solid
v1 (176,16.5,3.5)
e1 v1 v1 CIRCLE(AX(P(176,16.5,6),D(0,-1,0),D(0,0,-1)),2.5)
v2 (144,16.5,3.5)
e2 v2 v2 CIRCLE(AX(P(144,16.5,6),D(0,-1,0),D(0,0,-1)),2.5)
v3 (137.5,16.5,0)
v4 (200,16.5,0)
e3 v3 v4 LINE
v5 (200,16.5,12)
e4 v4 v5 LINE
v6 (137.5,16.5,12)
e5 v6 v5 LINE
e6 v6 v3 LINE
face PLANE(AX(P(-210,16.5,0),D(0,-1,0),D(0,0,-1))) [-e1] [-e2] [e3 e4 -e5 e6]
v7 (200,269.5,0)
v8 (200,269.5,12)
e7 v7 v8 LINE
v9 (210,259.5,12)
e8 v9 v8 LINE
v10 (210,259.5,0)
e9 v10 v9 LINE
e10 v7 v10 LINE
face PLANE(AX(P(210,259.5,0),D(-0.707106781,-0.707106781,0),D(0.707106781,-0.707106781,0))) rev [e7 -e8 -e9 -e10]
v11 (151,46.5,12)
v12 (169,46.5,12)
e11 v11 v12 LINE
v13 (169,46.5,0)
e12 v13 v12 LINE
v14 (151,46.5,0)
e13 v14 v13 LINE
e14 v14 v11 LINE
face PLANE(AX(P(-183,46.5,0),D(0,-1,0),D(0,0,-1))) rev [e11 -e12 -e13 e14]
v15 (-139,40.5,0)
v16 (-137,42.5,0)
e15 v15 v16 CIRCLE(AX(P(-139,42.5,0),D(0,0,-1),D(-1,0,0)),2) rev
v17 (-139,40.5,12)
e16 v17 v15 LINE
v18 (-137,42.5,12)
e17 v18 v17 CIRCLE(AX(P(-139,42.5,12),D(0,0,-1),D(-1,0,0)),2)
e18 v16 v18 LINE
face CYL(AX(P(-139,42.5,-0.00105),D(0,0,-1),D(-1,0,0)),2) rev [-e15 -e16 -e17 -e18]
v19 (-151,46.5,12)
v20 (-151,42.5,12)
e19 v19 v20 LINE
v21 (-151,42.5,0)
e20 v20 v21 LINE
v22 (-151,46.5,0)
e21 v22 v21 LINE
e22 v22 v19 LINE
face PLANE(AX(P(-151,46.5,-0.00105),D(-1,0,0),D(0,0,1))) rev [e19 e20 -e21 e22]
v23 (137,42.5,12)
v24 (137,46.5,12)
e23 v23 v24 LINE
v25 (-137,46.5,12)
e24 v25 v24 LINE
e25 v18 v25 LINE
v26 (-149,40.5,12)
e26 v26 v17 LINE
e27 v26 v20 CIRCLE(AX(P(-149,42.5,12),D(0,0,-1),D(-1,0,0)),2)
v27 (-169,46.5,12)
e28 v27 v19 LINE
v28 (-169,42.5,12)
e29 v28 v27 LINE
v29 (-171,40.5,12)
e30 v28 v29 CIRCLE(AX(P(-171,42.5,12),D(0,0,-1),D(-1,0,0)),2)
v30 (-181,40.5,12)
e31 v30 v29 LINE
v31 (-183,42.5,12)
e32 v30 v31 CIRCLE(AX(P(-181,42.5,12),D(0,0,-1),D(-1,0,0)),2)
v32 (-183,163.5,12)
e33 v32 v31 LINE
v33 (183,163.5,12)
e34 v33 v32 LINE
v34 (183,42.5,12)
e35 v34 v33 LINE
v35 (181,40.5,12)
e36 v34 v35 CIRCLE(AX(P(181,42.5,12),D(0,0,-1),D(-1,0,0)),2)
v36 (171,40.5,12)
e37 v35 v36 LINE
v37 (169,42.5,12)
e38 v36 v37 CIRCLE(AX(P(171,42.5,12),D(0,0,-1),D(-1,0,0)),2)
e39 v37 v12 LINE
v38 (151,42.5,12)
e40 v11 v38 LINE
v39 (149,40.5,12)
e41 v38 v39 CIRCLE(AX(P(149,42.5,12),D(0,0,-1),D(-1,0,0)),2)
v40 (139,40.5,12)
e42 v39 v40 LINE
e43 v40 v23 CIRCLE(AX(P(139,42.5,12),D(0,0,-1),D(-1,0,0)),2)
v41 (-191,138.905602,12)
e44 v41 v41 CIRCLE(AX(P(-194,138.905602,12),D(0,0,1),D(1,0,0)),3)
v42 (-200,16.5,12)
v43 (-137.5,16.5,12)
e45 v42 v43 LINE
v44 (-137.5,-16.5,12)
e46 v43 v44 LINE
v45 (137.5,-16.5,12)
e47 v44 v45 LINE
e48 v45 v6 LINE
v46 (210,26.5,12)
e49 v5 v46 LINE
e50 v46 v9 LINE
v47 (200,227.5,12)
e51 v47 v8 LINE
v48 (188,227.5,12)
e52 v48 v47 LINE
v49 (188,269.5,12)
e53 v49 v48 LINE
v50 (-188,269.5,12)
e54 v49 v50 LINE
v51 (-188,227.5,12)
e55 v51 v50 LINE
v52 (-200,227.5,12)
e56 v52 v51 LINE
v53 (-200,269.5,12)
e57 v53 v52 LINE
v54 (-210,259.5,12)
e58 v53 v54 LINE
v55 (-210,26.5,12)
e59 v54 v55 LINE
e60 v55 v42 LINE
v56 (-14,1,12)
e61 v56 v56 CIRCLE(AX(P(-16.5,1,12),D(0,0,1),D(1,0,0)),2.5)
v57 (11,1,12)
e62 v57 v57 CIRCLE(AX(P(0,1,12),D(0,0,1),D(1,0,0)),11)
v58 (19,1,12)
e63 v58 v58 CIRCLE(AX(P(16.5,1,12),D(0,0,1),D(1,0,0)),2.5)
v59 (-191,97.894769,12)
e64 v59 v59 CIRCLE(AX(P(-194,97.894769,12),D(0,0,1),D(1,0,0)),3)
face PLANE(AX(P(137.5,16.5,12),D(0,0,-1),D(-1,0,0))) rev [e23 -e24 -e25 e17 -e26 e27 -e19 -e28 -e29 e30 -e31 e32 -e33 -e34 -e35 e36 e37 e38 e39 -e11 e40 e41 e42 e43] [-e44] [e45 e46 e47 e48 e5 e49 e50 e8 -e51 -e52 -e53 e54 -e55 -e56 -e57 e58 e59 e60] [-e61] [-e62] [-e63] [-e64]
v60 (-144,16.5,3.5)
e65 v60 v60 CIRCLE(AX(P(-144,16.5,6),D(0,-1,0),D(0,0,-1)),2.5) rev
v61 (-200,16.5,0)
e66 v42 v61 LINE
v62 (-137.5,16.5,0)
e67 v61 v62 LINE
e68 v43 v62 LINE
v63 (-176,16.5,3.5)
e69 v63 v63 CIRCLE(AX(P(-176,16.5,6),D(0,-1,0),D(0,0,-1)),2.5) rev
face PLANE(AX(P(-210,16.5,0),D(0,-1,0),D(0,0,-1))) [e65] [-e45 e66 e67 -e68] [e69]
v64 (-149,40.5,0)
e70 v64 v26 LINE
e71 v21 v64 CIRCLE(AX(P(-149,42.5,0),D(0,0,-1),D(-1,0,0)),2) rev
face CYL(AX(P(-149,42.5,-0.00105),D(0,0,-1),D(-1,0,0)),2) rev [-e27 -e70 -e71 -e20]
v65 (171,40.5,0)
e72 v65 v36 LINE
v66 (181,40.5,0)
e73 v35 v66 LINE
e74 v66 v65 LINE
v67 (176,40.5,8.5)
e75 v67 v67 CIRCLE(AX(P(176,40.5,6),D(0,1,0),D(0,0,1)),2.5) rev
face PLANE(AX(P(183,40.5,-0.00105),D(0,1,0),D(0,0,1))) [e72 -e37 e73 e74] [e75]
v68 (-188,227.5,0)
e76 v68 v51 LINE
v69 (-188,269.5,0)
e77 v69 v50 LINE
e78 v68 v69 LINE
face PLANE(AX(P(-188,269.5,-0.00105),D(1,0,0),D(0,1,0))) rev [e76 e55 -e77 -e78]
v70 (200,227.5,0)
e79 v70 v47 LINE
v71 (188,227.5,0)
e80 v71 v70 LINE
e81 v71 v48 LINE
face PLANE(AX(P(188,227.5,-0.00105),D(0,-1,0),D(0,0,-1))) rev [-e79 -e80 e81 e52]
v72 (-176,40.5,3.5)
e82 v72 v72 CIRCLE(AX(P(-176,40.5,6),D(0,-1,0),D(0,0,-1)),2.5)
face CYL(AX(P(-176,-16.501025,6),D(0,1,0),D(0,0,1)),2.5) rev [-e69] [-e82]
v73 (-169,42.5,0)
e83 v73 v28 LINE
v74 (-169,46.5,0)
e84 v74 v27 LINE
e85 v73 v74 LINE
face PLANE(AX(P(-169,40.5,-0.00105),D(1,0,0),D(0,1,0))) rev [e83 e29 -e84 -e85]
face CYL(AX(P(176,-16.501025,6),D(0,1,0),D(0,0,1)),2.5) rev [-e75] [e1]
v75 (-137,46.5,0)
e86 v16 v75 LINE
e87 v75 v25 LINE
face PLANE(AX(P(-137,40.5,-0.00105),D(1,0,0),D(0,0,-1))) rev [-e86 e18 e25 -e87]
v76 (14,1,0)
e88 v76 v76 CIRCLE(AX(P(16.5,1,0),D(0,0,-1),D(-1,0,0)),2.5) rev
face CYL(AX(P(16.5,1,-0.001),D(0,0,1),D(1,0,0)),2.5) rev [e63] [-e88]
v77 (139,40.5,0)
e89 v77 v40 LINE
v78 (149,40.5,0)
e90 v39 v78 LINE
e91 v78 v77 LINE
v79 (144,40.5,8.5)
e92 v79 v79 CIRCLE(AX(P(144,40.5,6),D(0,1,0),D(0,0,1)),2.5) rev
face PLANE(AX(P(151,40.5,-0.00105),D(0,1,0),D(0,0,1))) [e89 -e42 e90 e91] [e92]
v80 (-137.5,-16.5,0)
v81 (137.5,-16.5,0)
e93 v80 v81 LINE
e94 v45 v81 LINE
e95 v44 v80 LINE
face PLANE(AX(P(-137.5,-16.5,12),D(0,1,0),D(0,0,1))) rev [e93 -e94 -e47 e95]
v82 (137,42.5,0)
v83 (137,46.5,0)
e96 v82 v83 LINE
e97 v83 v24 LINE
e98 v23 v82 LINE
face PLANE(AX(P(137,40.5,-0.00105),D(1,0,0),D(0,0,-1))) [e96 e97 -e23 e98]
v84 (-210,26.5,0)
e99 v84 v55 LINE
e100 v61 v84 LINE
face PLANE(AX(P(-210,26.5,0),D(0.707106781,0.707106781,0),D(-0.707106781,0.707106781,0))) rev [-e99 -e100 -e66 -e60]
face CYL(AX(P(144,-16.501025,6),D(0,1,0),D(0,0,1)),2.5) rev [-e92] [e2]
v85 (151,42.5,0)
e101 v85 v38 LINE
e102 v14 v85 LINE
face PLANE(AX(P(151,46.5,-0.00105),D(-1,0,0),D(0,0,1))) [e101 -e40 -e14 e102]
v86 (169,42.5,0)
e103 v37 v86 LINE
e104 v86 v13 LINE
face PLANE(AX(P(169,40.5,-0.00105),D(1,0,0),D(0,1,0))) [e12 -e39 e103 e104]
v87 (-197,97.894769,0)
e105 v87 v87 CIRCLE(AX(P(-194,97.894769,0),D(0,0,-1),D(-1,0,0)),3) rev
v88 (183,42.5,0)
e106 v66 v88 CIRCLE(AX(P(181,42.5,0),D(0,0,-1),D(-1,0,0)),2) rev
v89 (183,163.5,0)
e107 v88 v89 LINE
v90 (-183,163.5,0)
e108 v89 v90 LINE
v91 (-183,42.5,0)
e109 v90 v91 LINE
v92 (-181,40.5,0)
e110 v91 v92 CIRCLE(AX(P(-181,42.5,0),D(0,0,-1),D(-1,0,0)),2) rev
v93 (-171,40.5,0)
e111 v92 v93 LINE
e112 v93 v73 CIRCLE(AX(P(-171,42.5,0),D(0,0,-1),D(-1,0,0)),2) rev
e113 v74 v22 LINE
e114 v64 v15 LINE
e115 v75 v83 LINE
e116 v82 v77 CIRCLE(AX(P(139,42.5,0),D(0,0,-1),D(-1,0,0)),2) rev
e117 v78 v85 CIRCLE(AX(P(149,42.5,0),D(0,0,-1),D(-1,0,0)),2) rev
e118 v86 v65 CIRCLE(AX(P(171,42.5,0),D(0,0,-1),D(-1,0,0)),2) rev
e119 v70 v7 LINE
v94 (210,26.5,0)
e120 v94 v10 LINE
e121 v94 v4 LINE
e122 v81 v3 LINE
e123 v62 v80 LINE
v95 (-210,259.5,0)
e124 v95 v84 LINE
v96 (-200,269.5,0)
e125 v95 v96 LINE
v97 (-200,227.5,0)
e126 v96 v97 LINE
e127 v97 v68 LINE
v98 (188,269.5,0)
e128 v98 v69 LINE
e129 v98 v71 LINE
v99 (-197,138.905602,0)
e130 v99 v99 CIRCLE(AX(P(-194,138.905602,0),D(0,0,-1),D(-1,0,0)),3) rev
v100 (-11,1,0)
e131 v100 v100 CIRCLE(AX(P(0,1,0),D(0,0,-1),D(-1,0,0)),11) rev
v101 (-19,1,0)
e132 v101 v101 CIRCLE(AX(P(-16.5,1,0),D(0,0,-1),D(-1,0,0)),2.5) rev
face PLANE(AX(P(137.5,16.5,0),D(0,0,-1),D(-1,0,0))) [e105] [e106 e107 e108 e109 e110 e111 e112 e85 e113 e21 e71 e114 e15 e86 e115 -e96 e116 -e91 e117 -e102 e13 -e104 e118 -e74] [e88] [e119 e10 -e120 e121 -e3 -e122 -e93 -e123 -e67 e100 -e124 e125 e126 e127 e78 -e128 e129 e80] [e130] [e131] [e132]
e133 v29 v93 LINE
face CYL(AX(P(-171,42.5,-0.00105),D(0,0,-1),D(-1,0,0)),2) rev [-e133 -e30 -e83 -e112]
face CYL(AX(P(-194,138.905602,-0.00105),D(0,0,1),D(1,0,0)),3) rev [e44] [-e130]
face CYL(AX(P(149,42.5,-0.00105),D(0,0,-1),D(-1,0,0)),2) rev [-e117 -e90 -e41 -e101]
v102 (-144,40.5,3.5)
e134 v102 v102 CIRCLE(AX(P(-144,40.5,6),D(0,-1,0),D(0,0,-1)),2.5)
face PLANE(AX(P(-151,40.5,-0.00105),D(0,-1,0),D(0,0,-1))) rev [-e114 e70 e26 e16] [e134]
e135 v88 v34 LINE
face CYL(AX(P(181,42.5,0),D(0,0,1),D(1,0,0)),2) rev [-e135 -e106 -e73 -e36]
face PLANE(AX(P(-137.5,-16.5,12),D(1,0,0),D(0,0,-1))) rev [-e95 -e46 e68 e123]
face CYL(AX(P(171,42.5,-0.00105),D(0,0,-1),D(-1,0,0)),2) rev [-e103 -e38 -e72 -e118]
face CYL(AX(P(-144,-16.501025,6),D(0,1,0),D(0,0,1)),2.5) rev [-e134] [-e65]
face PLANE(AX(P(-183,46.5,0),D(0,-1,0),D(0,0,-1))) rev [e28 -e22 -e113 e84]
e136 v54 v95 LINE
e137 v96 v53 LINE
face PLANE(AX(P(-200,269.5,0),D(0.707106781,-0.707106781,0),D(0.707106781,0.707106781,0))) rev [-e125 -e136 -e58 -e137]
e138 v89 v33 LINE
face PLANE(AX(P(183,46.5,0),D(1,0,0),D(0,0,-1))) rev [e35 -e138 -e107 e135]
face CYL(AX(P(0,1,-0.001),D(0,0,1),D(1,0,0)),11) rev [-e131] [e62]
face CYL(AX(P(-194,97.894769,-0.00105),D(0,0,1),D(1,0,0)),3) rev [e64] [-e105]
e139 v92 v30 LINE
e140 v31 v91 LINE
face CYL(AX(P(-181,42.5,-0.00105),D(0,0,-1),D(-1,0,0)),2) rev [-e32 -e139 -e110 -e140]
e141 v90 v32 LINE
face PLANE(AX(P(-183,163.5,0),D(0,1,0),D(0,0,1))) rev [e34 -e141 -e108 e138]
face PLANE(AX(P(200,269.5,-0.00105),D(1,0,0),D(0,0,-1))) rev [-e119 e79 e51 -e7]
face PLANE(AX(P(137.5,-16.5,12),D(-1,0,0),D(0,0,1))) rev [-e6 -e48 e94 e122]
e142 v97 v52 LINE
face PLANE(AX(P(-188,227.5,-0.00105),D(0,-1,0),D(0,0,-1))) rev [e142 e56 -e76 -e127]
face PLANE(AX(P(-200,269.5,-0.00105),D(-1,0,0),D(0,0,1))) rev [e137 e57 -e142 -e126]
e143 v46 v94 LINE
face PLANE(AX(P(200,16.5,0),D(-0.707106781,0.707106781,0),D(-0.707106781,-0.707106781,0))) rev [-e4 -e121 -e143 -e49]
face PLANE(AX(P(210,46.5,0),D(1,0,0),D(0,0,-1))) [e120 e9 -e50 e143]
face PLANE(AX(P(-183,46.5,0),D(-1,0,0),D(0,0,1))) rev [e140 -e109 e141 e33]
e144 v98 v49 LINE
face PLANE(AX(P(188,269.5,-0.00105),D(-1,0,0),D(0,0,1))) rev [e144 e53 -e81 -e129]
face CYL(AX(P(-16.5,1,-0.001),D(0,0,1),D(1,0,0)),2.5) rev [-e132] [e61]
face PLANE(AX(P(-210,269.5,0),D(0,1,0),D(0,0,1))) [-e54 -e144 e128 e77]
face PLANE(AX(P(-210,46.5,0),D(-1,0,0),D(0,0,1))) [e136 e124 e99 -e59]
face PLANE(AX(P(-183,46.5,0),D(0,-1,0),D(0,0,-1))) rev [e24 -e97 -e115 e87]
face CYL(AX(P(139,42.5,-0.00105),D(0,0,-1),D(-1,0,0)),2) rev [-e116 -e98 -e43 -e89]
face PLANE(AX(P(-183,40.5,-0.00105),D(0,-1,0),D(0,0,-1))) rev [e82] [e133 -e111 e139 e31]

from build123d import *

# Parameters (mm, degrees)
SKETCH1_W            = 275
SKETCH1_H            = 33
BOSS_EXTRUDE1_DEPTH  = 12
CUT_EXTRUDE1_REACH   = 141.005
SKETCH2_R            = 11
SKETCH2_R_2          = 2.5
SKETCH3_W            = 366
SKETCH3_H            = 117
BOSS_EXTRUDE2_DEPTH  = 12
CUT_EXTRUDE2_REACH   = 308.55
SKETCH4_R            = 2.5
CUT_EXTRUDE3_REACH   = 343.869
SKETCH5_W            = 14
SKETCH5_H            = 6
FILLET1_R            = 2
FILLET1_OF_MIRROR2_R = 2
CHAMFER1_SIZE        = 10
CUT_EXTRUDE4_REACH   = 343.869
SKETCH6_R            = 3
CUT_EXTRUDE6_REACH   = 343.869
SKETCH8_W            = 12
SKETCH8_H            = 42
CHAMFER2_SIZE        = 10


with BuildPart() as part:
    # Sketch1 → Boss-Extrude1 (new body)
    with BuildSketch(Plane.XY):
        Rectangle(SKETCH1_W, SKETCH1_H)
    extrude(amount=BOSS_EXTRUDE1_DEPTH)

    # Sketch2 → Cut-Extrude1 (cut, up to next)
    with BuildSketch(Plane.XY.offset(12), mode=Mode.PRIVATE) as cut_extrude1_sk1:
        with Locations((0, 1)):
            Circle(SKETCH2_R)
    cut_extrude1_tool1 = extrude(cut_extrude1_sk1.sketch, amount=-CUT_EXTRUDE1_REACH, mode=Mode.PRIVATE) & part.part
    # Sketch2 → Cut-Extrude1 (cut, up to next)
    with BuildSketch(Plane.XY.offset(12), mode=Mode.PRIVATE) as cut_extrude1_sk2:
        with Locations((-16.5, 1)):
            Circle(SKETCH2_R_2)
    cut_extrude1_tool2 = extrude(cut_extrude1_sk2.sketch, amount=-CUT_EXTRUDE1_REACH, mode=Mode.PRIVATE) & part.part
    # Sketch2 → Cut-Extrude1 (cut, up to next)
    with BuildSketch(Plane.XY.offset(12), mode=Mode.PRIVATE) as cut_extrude1_sk3:
        with Locations((16.5, 1)):
            Circle(SKETCH2_R_2)
    cut_extrude1_tool3 = extrude(cut_extrude1_sk3.sketch, amount=-CUT_EXTRUDE1_REACH, mode=Mode.PRIVATE) & part.part
    add(cut_extrude1_tool1.solids().sort_by_distance((0, 1, 12))[0], mode=Mode.SUBTRACT)
    add(cut_extrude1_tool2.solids().sort_by_distance((-16.5, 1, 12))[0], mode=Mode.SUBTRACT)
    add(cut_extrude1_tool3.solids().sort_by_distance((16.5, 1, 12))[0], mode=Mode.SUBTRACT)

    # Sketch3 → Boss-Extrude2 (add)
    with BuildSketch(Plane.XY.offset(12)):
        Polygon((-210, 16.5), (210, 16.5), (210, 46.5), (210, 269.5), (-210, 269.5), (-210, 46.5), align=None)
        with Locations((0, 105)):
            Rectangle(SKETCH3_W, SKETCH3_H, mode=Mode.SUBTRACT)
    extrude(amount=-BOSS_EXTRUDE2_DEPTH)

    # Sketch4 → Cut-Extrude2 (cut, up to next)
    with BuildSketch(Plane(origin=(0, 46.5, 0), x_dir=(1, 0, 0), z_dir=(0, 1, 0)), mode=Mode.PRIVATE) as cut_extrude2_sk1:
        with Locations(Location((-144, -6, 0), (0, 0, 270))):
            Circle(SKETCH4_R)
    cut_extrude2_tool1 = extrude(cut_extrude2_sk1.sketch, amount=-CUT_EXTRUDE2_REACH, mode=Mode.PRIVATE) & part.part
    # Sketch4 → Cut-Extrude2 (cut, up to next)
    with BuildSketch(Plane(origin=(0, 46.5, 0), x_dir=(1, 0, 0), z_dir=(0, 1, 0)), mode=Mode.PRIVATE) as cut_extrude2_sk2:
        with Locations(Location((-176, -6, 0), (0, 0, 270))):
            Circle(SKETCH4_R)
    cut_extrude2_tool2 = extrude(cut_extrude2_sk2.sketch, amount=-CUT_EXTRUDE2_REACH, mode=Mode.PRIVATE) & part.part
    cut_extrude2_1 = cut_extrude2_tool1.solids().sort_by_distance((-144, 46.5, 6))[0]
    add(cut_extrude2_1, mode=Mode.SUBTRACT)
    cut_extrude2_2 = cut_extrude2_tool2.solids().sort_by_distance((-176, 46.5, 6))[0]
    add(cut_extrude2_2, mode=Mode.SUBTRACT)
    cut_extrude2 = cut_extrude2_1 + cut_extrude2_2  # Cut-Extrude2 as one shape, for the pattern or mirror that repeats it

    # Mirror1: Cut-Extrude2 across plane
    add(cut_extrude2.mirror(Plane(origin=(0, 0, 0), x_dir=(0, 0, 1), z_dir=(1, 0, 0))), mode=Mode.SUBTRACT)

    # Sketch5 → Cut-Extrude3 (cut, up to next)
    with BuildSketch(Plane.XY.offset(12), mode=Mode.PRIVATE) as cut_extrude3_sk1:
        with Locations((-176, 43.5)):
            Rectangle(SKETCH5_W, SKETCH5_H)
    cut_extrude3_tool1 = extrude(cut_extrude3_sk1.sketch, amount=-CUT_EXTRUDE3_REACH, mode=Mode.PRIVATE) & part.part
    # Sketch5 → Cut-Extrude3 (cut, up to next)
    with BuildSketch(Plane.XY.offset(12), mode=Mode.PRIVATE) as cut_extrude3_sk2:
        with Locations((-144, 43.5)):
            Rectangle(SKETCH5_W, SKETCH5_H)
    cut_extrude3_tool2 = extrude(cut_extrude3_sk2.sketch, amount=-CUT_EXTRUDE3_REACH, mode=Mode.PRIVATE) & part.part
    cut_extrude3_1 = cut_extrude3_tool1.solids().sort_by_distance((-176, 43.5, 12))[0]
    add(cut_extrude3_1, mode=Mode.SUBTRACT)
    cut_extrude3_2 = cut_extrude3_tool2.solids().sort_by_distance((-144, 43.5, 12))[0]
    add(cut_extrude3_2, mode=Mode.SUBTRACT)
    cut_extrude3 = cut_extrude3_1 + cut_extrude3_2  # Cut-Extrude3 as one shape, for the pattern or mirror that repeats it

    # Fillet1
    fillet1_edges = [part.edges().sort_by_distance(p)[0] for p in [
        (-169, 40.5, 6),
        (-183, 40.5, 6),
        (-137, 40.5, 6),
        (-151, 40.5, 6),
    ]]
    fillet(fillet1_edges, radius=FILLET1_R)

    # Mirror2: Cut-Extrude3 across plane
    add(cut_extrude3.mirror(Plane(origin=(0, 0, 0), x_dir=(0, 0, 1), z_dir=(1, 0, 0))), mode=Mode.SUBTRACT)

    # Fillet1 of Mirror2
    fillet1_of_mirror2_edges = [part.edges().sort_by_distance(p)[0] for p in [
        (169, 40.5, 6),
        (183, 40.5, 6),
        (137, 40.5, 6),
        (151, 40.5, 6),
    ]]
    fillet(fillet1_of_mirror2_edges, radius=FILLET1_OF_MIRROR2_R)

    # Chamfer1
    chamfer1_edges = [part.edges().sort_by_distance(p)[0] for p in [
        (210, 16.5, 6),
        (-210, 16.5, 6),
    ]]
    chamfer(chamfer1_edges, length=CHAMFER1_SIZE)

    # Sketch6 → Cut-Extrude4 (cut, up to next)
    with BuildSketch(Plane.XY.offset(12), mode=Mode.PRIVATE) as cut_extrude4_sk1:
        with Locations((-194, 138.905602013)):
            Circle(SKETCH6_R)
    cut_extrude4_tool1 = extrude(cut_extrude4_sk1.sketch, amount=-CUT_EXTRUDE4_REACH, mode=Mode.PRIVATE) & part.part
    # Sketch6 → Cut-Extrude4 (cut, up to next)
    with BuildSketch(Plane.XY.offset(12), mode=Mode.PRIVATE) as cut_extrude4_sk2:
        with Locations((-194, 97.894768826)):
            Circle(SKETCH6_R)
    cut_extrude4_tool2 = extrude(cut_extrude4_sk2.sketch, amount=-CUT_EXTRUDE4_REACH, mode=Mode.PRIVATE) & part.part
    add(cut_extrude4_tool1.solids().sort_by_distance((-194, 138.905602, 12))[0], mode=Mode.SUBTRACT)
    add(cut_extrude4_tool2.solids().sort_by_distance((-194, 97.894769, 12))[0], mode=Mode.SUBTRACT)

    # Sketch8 → Cut-Extrude6 (cut, up to next)
    with BuildSketch(Plane.XY.offset(12), mode=Mode.PRIVATE) as cut_extrude6_sk1:
        with Locations((-194, 248.5)):
            Rectangle(SKETCH8_W, SKETCH8_H)
    cut_extrude6_tool1 = extrude(cut_extrude6_sk1.sketch, amount=-CUT_EXTRUDE6_REACH, mode=Mode.PRIVATE) & part.part
    # Sketch8 → Cut-Extrude6 (cut, up to next)
    with BuildSketch(Plane.XY.offset(12), mode=Mode.PRIVATE) as cut_extrude6_sk2:
        with Locations((194, 248.5)):
            Rectangle(SKETCH8_W, SKETCH8_H)
    cut_extrude6_tool2 = extrude(cut_extrude6_sk2.sketch, amount=-CUT_EXTRUDE6_REACH, mode=Mode.PRIVATE) & part.part
    add(cut_extrude6_tool1.solids().sort_by_distance((-194, 248.5, 12))[0], mode=Mode.SUBTRACT)
    add(cut_extrude6_tool2.solids().sort_by_distance((194, 248.5, 12))[0], mode=Mode.SUBTRACT)

    # Chamfer2
    chamfer2_edges = [part.edges().sort_by_distance(p)[0] for p in [
        (210, 269.5, 6),
        (-210, 269.5, 6),
    ]]
    chamfer(chamfer2_edges, length=CHAMFER2_SIZE - 0.0001)  # a hair under: the kernel refuses the full size


solid = part.part
